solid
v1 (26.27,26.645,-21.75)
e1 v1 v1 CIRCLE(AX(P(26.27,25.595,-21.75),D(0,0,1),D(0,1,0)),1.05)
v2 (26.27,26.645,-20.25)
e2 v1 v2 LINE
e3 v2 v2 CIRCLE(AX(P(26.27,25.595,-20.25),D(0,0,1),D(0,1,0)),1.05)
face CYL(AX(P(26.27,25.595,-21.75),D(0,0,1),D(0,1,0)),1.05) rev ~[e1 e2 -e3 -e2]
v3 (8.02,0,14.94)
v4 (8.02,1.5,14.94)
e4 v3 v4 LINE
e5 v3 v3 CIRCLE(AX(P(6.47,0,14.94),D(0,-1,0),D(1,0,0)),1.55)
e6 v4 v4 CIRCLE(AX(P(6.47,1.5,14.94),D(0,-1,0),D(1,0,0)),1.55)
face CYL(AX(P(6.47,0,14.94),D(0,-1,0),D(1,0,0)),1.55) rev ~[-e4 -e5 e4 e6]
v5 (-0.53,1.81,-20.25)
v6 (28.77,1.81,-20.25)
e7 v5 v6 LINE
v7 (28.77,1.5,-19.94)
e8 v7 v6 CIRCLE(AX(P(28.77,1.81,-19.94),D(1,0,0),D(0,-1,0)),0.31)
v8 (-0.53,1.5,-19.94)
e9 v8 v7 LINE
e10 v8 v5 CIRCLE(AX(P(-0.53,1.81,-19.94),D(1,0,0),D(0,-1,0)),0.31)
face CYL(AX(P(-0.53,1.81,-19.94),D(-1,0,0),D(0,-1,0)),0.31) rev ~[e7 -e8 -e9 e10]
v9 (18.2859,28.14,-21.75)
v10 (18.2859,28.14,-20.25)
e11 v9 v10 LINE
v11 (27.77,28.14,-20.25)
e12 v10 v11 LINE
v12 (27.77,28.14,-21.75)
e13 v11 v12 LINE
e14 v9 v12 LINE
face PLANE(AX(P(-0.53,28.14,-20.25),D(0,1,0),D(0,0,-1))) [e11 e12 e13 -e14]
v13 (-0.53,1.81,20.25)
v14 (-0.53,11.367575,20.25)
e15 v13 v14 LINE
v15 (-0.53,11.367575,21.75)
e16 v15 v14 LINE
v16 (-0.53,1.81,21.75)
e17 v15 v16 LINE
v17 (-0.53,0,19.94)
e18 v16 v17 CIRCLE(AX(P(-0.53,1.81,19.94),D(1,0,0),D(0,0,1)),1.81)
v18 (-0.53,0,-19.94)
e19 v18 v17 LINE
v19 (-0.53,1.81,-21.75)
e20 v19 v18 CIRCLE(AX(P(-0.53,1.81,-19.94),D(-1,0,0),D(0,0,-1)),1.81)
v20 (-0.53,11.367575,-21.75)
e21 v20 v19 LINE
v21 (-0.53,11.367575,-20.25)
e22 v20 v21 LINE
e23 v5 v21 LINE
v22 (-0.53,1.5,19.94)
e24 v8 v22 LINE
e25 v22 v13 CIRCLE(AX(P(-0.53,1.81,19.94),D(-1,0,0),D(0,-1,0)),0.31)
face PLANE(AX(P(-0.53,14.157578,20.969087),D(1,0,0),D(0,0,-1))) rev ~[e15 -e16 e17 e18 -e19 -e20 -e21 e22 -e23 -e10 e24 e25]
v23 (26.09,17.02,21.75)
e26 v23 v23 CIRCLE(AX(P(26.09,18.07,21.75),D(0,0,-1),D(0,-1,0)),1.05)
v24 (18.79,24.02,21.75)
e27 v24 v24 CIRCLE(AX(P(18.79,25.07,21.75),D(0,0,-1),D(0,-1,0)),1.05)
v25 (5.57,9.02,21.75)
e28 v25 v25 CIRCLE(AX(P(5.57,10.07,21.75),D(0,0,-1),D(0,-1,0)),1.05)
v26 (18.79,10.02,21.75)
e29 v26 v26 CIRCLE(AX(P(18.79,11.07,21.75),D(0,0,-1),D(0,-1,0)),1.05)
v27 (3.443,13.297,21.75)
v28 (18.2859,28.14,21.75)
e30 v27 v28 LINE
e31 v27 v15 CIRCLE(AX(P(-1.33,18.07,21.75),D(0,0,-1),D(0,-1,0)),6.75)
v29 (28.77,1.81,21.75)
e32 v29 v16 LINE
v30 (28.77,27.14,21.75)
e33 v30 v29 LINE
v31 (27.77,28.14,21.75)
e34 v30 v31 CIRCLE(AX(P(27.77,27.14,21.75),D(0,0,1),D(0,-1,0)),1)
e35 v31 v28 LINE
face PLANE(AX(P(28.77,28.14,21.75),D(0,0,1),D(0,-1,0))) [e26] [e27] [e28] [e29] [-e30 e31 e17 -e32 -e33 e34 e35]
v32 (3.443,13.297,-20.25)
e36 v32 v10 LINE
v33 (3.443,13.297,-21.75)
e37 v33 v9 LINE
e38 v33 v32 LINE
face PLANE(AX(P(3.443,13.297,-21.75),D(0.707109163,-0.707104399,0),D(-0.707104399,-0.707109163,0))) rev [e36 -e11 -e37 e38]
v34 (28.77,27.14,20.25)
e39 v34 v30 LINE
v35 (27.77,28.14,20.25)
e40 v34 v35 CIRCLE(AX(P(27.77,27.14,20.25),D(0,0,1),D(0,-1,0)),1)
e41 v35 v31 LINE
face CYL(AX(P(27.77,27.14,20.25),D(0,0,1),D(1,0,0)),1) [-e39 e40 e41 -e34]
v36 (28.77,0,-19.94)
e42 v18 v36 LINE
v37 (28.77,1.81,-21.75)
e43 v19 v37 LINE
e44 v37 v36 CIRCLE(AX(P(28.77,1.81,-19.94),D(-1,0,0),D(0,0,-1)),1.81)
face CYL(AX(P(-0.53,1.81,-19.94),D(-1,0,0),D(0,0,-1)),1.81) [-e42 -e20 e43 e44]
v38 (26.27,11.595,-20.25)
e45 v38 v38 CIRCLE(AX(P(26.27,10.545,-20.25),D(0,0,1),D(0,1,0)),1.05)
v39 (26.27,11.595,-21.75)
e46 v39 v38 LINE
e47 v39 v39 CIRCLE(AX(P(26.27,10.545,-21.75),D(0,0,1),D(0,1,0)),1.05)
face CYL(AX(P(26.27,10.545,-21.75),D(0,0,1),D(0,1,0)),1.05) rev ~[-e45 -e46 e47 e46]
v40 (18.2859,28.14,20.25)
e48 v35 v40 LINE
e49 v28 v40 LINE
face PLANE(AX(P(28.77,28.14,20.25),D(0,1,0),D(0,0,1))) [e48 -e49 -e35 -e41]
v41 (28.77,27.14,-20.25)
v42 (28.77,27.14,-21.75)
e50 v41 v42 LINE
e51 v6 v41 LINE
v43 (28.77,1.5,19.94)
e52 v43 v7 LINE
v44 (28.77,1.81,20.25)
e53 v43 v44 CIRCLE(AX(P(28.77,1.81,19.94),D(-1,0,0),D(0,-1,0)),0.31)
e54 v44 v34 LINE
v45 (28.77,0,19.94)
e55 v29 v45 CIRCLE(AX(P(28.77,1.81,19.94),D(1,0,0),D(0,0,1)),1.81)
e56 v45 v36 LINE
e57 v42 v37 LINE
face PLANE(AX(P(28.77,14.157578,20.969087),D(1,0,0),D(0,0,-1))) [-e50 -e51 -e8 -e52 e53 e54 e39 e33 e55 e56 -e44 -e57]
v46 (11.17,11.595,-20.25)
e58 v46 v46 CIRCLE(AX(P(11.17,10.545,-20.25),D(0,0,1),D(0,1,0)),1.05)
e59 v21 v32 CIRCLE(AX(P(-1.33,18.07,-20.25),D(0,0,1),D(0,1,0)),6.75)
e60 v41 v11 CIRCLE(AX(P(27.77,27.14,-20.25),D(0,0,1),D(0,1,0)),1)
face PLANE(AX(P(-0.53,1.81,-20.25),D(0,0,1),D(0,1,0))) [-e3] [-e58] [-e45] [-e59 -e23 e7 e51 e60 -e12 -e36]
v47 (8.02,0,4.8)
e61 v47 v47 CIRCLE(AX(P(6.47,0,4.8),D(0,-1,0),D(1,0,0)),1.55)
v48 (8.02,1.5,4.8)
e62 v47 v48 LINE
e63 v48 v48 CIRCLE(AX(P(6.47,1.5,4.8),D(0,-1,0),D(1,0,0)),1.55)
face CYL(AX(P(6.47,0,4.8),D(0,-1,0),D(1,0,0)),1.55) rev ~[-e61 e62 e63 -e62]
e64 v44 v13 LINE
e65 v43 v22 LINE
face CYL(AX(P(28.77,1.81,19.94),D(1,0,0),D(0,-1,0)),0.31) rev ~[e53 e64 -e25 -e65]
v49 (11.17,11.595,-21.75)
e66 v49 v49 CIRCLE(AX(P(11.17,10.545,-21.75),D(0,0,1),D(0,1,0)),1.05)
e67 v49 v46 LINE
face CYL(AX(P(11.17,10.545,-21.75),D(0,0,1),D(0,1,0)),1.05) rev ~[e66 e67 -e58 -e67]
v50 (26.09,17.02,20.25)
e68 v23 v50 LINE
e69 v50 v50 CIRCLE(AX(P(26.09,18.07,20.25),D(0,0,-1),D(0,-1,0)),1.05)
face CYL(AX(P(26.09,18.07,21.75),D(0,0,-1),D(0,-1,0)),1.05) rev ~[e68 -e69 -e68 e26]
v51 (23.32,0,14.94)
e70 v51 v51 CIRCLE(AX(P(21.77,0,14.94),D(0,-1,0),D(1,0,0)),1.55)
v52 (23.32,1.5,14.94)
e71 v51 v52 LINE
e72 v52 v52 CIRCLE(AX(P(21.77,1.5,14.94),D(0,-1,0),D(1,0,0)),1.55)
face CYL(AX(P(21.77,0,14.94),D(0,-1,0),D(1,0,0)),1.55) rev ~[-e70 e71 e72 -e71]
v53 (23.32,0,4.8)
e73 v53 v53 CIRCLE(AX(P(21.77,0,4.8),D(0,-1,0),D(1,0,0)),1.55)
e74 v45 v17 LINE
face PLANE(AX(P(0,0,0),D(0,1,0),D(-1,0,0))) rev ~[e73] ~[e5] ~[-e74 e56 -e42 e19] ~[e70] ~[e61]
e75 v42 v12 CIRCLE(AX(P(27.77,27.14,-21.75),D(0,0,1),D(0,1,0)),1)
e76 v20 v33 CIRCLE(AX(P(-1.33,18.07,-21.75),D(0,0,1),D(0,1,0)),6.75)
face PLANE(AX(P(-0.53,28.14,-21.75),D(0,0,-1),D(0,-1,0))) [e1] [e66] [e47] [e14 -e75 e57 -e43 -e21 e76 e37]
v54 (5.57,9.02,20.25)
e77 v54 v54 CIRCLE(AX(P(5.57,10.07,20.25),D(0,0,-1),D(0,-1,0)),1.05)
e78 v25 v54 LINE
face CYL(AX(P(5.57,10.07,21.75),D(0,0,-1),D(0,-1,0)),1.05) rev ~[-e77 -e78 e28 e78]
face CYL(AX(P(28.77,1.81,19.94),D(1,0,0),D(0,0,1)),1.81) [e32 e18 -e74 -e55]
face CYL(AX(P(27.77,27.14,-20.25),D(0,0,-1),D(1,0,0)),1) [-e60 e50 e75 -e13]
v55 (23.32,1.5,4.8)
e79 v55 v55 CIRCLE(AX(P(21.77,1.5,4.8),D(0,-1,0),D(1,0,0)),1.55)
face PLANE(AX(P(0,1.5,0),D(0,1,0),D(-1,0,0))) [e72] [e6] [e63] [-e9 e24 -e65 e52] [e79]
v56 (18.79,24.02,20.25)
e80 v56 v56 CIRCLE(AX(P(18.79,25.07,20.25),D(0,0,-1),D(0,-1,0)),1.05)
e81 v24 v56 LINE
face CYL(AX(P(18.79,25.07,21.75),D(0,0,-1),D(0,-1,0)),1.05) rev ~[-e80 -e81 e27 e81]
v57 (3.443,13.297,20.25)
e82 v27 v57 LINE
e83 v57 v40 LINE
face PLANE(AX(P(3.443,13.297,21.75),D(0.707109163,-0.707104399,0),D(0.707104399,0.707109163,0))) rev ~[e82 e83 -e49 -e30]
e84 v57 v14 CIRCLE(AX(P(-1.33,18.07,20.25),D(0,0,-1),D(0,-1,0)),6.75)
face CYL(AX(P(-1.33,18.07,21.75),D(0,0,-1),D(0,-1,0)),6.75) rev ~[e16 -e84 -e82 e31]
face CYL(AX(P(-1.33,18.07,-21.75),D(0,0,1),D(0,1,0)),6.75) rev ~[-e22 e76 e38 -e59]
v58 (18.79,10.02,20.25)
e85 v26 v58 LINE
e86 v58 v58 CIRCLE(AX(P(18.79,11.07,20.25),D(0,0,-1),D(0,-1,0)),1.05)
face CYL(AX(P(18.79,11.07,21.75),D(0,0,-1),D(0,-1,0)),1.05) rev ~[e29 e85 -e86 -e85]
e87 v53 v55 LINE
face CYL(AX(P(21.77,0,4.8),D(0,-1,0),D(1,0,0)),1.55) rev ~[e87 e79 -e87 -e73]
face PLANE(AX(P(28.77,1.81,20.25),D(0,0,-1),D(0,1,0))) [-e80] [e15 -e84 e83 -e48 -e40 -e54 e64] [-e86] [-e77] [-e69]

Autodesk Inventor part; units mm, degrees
ref_plane "YZ Plane" through (0, 0, 0) normal (1, 0, 0) x (0, 1, 0)
ref_plane "XZ Plane" through (0, 0, 0) normal (0, 1, 0) x (-1, 0, 0)
ref_plane "XY Plane" through (0, 0, 0) normal (0, 0, 1) x (1, 0, 0)
sketch "Sketch1" plane through (0, 0, 0) normal (0, 1, 0) x (-1, 0, 0)
  line L0 (0.53, 20.25) -> (-28.77, 20.25)
  line L1 (-28.77, 20.25) -> (-28.77, -20.25)
  line L2 (-28.77, -20.25) -> (0.53, -20.25)
  line L3 (0.53, -20.25) -> (0.53, 20.25)
  point P0 (0, 0)
  dimension "d0" = 40.5
  dimension "d1" = 29.3
  dimension "d2" = -0.53
  dimension "d3" = 20.25
extrude "Plate1" add sketch "Sketch1" along normal blind 1.5
sketch "Sketch2" plane through (28.77, 0, 21.75) normal (0, 0, -1) x (-1, 0, 0)
  line L0 (29.3, 0) -> (0, 0)
  line L1 (0, 0) -> (0, 28.14)
  line L2 (0, 28.14) -> (29.3, 28.14)
  line L3 (29.3, 28.14) -> (29.3, 0)
edge flange "Flange1" height 28.14 angle 90 thickness 1.5 bend radius 0.31 thickness toward (0, 0, -1) relief tear relief width 1.5 relief depth 0.75 corner gap 0.31 corner form 0 edges at (14.12, 1.5, 20.25) (14.12, 1.5, -20.25) wall of the first edge with corners at (-0.53, 0, 21.75) (28.77, 0, 21.75) (28.77, 28.14, 21.75) (-0.53, 28.14, 21.75)
bend "Bend1"
corner "Corner1"
sketch "Sketch6" plane through (-0.53, 28.14, 21.75) normal (0, 0, 1) x (1, 0, 0)
  point P0 (0.53, -28.14)
sketch "Sketch8" plane through (28.77, 28.14, -21.75) normal (0, 0, -1) x (-1, 0, 0)
  circle A0 centre (2.5, -2.545) radius 0.7835
  circle A1 centre (2.5, -17.595) radius 0.7835
  circle A2 centre (17.6, -2.545) radius 0.7835
  circle A3 centre (17.6, -17.595) radius 0.7835
  circle A4 centre (37.6, -2.545) radius 0.7835
  circle A5 centre (37.6, -17.595) radius 0.7835
  point P0 (28.77, -28.14)
hole "Hole4" at (26.27, 25.595, -21.75) at (26.27, 10.545, -21.75) at (11.17, 25.595, -21.75) at (11.17, 10.545, -21.75) at (-8.83, 25.595, -21.75) at (-8.83, 10.545, -21.75) direction (0, 0, 1) diameter 2.1 depth 1.5
sketch "Sketch9" plane through (28.77, 28.14, -21.75) normal (0, 0, -1) x (-1, 0, 0)
  circle A0 centre (30.1, -10.07) radius 6
  point P0 (28.77, -28.14)
sketch "Sketch10" plane through (-0.53, 28.14, 21.75) normal (0, 0, 1) x (1, 0, 0)
  point P0 (0.53, -28.14)
sketch "Sketch11" plane through (-0.53, 28.14, 21.75) normal (0, 0, 1) x (1, 0, 0)
  point P0 (0.53, -28.14)
sketch "Sketch15" plane through (0, 0, 0) normal (0, -1, 0) x (1, 0, 0)
  point P0 (0, 0)
sketch "Sketch16" plane through (0, 0, 0) normal (0, -1, 0) x (1, 0, 0)
  circle A0 centre (6.47, 14.94) radius 1.55
  line L0 (28.77, 19.94) -> (-0.53, 19.94) projected
  line L1 (-0.53, -19.94) -> (-0.53, 19.94) projected
  circle A1 centre (21.77, 14.94) radius 1.55
  line L2 (28.77, 19.94) -> (28.77, -19.94) projected
  circle A2 centre (6.47, 4.8) radius 1.55
  circle A3 centre (21.77, 4.8) radius 1.55
  point P0 (0, 0)
  dimension "d65" = 3.1
  dimension "d66" = 5
  dimension "d67" = 7
  dimension "d68" = 3.1
  dimension "d69" = 5
  dimension "d70" = 7
  dimension "d71" = 3.1
  dimension "d72" = 15.14
  dimension "d73" = 7
  dimension "d74" = 3.1
  dimension "d75" = 15.14
  dimension "d76" = 7
extrude "Cut6" cut sketch "Sketch16" against normal blind 1.5
sketch "Sketch18" plane through (-0.53, 28.14, 21.75) normal (0, 0, 1) x (1, 0, 0)
  circle A0 centre (-0.8, -10.07) radius 6
  point P0 (0.53, -28.14)
fillet "Corner Round1" radius 1 4 edges at (-0.53, 28.14, -21) (28.77, 28.14, -21) (28.77, 28.14, 21) (-0.53, 28.14, 21)
sketch "Sketch19" plane through (-0.53, 1.81, 21.75) normal (0, 0, 1) x (1, 0, 0)
  circle A0 centre (6.1, 24.26) radius 0.7835
  circle A1 centre (19.32, 23.26) radius 0.7835
  circle A2 centre (26.62, 16.26) radius 0.7835
  circle A3 centre (19.32, 9.26) radius 0.7835
  circle A4 centre (6.1, 8.26) radius 0.7835
  point P0 (0.53, -1.81)
hole "Hole6" at (5.57, 26.07, 21.75) at (18.79, 25.07, 21.75) at (26.09, 18.07, 21.75) at (18.79, 11.07, 21.75) at (5.57, 10.07, 21.75) direction (0, 0, -1) diameter 2.1 depth 1.5
hole "Hole7" at (-1.33, 18.07, 21.75) direction (0, 0, -1) diameter 13.5 depth 1.5
hole "Hole8" at (-1.33, 18.07, -21.75) direction (0, 0, 1) diameter 13.5 depth 1.5
sketch "Sketch20" plane through (-0.53, 1.81, 21.75) normal (0, 0, 1) x (1, 0, 0)
  arc A0 (0, 9.5576) -> (0, 22.9624) centre (-0.8, 16.26) ccw projected
  line L0 (3.973, 11.487) -> (18.8159, 26.33)
  line L1 (1, 26.33) -> (28.3, 26.33) projected
  arc A1 (1, 26.33) -> (0, 25.33) centre (1, 25.33) ccw projected
  line L2 (0, 22.9624) -> (0, 25.33) projected
  line L3 (18.8159, 26.33) -> (1, 26.33)
  arc A2 (1, 26.33) -> (0, 25.33) centre (1, 25.33) ccw
  line L4 (0, 25.33) -> (0, 22.9624)
  arc A3 (3.973, 11.487) -> (0, 22.9624) centre (-0.8, 16.26) ccw
  point P0 (0.53, -1.81)
  dimension "d110" = 45
  dimension "d111" = 0
extrude "Cut8" cut sketch "Sketch20" against normal blind 1.5
mirror "Mirror1" about plane through (0, 0, 0) normal (0, 0, 1) of "Cut8"
equation "\"d55\" = Thickness"
equation "\"d77\" = Thickness"
equation "\"d94\" = Thickness"
equation "\"d101\" = Thickness"
equation "\"d108\" = Thickness"
equation "\"d112\" = Thickness"
equation "\"d4\" = Thickness"
equation "\"d5\" = BendReliefWidth"
equation "\"d6\" = BendReliefDepth"
equation "\"d7\" = MinimumRemnant"
equation "\"d8\" = TransitionRadius"
equation "\"d11\" = BendRadius"
equation "\"d12\" = CornerReliefSize"
equation "\"d13\" = GapSize"
equation "\"d14\" = JacobiRadiusSize"
equation "\"BendReliefWidth\" = Thickness"
equation "\"BendReliefDepth\" = 0.5 * Thickness"
equation "\"CornerReliefSize\" = 4 * Thickness"
equation "\"MinimumRemnant\" = 2 * Thickness"
equation "\"TransitionRadius\" = BendRadius"
equation "\"JacobiRadiusSize\" = BendRadius"
equation "\"GapSize\" = Thickness"
equation "\"Thickness\" = 1.5"
equation "\"BendRadius\" = 0.31"
properties part number "axis_25_bottom_frame" material "Aluminum 6061-AHC"
